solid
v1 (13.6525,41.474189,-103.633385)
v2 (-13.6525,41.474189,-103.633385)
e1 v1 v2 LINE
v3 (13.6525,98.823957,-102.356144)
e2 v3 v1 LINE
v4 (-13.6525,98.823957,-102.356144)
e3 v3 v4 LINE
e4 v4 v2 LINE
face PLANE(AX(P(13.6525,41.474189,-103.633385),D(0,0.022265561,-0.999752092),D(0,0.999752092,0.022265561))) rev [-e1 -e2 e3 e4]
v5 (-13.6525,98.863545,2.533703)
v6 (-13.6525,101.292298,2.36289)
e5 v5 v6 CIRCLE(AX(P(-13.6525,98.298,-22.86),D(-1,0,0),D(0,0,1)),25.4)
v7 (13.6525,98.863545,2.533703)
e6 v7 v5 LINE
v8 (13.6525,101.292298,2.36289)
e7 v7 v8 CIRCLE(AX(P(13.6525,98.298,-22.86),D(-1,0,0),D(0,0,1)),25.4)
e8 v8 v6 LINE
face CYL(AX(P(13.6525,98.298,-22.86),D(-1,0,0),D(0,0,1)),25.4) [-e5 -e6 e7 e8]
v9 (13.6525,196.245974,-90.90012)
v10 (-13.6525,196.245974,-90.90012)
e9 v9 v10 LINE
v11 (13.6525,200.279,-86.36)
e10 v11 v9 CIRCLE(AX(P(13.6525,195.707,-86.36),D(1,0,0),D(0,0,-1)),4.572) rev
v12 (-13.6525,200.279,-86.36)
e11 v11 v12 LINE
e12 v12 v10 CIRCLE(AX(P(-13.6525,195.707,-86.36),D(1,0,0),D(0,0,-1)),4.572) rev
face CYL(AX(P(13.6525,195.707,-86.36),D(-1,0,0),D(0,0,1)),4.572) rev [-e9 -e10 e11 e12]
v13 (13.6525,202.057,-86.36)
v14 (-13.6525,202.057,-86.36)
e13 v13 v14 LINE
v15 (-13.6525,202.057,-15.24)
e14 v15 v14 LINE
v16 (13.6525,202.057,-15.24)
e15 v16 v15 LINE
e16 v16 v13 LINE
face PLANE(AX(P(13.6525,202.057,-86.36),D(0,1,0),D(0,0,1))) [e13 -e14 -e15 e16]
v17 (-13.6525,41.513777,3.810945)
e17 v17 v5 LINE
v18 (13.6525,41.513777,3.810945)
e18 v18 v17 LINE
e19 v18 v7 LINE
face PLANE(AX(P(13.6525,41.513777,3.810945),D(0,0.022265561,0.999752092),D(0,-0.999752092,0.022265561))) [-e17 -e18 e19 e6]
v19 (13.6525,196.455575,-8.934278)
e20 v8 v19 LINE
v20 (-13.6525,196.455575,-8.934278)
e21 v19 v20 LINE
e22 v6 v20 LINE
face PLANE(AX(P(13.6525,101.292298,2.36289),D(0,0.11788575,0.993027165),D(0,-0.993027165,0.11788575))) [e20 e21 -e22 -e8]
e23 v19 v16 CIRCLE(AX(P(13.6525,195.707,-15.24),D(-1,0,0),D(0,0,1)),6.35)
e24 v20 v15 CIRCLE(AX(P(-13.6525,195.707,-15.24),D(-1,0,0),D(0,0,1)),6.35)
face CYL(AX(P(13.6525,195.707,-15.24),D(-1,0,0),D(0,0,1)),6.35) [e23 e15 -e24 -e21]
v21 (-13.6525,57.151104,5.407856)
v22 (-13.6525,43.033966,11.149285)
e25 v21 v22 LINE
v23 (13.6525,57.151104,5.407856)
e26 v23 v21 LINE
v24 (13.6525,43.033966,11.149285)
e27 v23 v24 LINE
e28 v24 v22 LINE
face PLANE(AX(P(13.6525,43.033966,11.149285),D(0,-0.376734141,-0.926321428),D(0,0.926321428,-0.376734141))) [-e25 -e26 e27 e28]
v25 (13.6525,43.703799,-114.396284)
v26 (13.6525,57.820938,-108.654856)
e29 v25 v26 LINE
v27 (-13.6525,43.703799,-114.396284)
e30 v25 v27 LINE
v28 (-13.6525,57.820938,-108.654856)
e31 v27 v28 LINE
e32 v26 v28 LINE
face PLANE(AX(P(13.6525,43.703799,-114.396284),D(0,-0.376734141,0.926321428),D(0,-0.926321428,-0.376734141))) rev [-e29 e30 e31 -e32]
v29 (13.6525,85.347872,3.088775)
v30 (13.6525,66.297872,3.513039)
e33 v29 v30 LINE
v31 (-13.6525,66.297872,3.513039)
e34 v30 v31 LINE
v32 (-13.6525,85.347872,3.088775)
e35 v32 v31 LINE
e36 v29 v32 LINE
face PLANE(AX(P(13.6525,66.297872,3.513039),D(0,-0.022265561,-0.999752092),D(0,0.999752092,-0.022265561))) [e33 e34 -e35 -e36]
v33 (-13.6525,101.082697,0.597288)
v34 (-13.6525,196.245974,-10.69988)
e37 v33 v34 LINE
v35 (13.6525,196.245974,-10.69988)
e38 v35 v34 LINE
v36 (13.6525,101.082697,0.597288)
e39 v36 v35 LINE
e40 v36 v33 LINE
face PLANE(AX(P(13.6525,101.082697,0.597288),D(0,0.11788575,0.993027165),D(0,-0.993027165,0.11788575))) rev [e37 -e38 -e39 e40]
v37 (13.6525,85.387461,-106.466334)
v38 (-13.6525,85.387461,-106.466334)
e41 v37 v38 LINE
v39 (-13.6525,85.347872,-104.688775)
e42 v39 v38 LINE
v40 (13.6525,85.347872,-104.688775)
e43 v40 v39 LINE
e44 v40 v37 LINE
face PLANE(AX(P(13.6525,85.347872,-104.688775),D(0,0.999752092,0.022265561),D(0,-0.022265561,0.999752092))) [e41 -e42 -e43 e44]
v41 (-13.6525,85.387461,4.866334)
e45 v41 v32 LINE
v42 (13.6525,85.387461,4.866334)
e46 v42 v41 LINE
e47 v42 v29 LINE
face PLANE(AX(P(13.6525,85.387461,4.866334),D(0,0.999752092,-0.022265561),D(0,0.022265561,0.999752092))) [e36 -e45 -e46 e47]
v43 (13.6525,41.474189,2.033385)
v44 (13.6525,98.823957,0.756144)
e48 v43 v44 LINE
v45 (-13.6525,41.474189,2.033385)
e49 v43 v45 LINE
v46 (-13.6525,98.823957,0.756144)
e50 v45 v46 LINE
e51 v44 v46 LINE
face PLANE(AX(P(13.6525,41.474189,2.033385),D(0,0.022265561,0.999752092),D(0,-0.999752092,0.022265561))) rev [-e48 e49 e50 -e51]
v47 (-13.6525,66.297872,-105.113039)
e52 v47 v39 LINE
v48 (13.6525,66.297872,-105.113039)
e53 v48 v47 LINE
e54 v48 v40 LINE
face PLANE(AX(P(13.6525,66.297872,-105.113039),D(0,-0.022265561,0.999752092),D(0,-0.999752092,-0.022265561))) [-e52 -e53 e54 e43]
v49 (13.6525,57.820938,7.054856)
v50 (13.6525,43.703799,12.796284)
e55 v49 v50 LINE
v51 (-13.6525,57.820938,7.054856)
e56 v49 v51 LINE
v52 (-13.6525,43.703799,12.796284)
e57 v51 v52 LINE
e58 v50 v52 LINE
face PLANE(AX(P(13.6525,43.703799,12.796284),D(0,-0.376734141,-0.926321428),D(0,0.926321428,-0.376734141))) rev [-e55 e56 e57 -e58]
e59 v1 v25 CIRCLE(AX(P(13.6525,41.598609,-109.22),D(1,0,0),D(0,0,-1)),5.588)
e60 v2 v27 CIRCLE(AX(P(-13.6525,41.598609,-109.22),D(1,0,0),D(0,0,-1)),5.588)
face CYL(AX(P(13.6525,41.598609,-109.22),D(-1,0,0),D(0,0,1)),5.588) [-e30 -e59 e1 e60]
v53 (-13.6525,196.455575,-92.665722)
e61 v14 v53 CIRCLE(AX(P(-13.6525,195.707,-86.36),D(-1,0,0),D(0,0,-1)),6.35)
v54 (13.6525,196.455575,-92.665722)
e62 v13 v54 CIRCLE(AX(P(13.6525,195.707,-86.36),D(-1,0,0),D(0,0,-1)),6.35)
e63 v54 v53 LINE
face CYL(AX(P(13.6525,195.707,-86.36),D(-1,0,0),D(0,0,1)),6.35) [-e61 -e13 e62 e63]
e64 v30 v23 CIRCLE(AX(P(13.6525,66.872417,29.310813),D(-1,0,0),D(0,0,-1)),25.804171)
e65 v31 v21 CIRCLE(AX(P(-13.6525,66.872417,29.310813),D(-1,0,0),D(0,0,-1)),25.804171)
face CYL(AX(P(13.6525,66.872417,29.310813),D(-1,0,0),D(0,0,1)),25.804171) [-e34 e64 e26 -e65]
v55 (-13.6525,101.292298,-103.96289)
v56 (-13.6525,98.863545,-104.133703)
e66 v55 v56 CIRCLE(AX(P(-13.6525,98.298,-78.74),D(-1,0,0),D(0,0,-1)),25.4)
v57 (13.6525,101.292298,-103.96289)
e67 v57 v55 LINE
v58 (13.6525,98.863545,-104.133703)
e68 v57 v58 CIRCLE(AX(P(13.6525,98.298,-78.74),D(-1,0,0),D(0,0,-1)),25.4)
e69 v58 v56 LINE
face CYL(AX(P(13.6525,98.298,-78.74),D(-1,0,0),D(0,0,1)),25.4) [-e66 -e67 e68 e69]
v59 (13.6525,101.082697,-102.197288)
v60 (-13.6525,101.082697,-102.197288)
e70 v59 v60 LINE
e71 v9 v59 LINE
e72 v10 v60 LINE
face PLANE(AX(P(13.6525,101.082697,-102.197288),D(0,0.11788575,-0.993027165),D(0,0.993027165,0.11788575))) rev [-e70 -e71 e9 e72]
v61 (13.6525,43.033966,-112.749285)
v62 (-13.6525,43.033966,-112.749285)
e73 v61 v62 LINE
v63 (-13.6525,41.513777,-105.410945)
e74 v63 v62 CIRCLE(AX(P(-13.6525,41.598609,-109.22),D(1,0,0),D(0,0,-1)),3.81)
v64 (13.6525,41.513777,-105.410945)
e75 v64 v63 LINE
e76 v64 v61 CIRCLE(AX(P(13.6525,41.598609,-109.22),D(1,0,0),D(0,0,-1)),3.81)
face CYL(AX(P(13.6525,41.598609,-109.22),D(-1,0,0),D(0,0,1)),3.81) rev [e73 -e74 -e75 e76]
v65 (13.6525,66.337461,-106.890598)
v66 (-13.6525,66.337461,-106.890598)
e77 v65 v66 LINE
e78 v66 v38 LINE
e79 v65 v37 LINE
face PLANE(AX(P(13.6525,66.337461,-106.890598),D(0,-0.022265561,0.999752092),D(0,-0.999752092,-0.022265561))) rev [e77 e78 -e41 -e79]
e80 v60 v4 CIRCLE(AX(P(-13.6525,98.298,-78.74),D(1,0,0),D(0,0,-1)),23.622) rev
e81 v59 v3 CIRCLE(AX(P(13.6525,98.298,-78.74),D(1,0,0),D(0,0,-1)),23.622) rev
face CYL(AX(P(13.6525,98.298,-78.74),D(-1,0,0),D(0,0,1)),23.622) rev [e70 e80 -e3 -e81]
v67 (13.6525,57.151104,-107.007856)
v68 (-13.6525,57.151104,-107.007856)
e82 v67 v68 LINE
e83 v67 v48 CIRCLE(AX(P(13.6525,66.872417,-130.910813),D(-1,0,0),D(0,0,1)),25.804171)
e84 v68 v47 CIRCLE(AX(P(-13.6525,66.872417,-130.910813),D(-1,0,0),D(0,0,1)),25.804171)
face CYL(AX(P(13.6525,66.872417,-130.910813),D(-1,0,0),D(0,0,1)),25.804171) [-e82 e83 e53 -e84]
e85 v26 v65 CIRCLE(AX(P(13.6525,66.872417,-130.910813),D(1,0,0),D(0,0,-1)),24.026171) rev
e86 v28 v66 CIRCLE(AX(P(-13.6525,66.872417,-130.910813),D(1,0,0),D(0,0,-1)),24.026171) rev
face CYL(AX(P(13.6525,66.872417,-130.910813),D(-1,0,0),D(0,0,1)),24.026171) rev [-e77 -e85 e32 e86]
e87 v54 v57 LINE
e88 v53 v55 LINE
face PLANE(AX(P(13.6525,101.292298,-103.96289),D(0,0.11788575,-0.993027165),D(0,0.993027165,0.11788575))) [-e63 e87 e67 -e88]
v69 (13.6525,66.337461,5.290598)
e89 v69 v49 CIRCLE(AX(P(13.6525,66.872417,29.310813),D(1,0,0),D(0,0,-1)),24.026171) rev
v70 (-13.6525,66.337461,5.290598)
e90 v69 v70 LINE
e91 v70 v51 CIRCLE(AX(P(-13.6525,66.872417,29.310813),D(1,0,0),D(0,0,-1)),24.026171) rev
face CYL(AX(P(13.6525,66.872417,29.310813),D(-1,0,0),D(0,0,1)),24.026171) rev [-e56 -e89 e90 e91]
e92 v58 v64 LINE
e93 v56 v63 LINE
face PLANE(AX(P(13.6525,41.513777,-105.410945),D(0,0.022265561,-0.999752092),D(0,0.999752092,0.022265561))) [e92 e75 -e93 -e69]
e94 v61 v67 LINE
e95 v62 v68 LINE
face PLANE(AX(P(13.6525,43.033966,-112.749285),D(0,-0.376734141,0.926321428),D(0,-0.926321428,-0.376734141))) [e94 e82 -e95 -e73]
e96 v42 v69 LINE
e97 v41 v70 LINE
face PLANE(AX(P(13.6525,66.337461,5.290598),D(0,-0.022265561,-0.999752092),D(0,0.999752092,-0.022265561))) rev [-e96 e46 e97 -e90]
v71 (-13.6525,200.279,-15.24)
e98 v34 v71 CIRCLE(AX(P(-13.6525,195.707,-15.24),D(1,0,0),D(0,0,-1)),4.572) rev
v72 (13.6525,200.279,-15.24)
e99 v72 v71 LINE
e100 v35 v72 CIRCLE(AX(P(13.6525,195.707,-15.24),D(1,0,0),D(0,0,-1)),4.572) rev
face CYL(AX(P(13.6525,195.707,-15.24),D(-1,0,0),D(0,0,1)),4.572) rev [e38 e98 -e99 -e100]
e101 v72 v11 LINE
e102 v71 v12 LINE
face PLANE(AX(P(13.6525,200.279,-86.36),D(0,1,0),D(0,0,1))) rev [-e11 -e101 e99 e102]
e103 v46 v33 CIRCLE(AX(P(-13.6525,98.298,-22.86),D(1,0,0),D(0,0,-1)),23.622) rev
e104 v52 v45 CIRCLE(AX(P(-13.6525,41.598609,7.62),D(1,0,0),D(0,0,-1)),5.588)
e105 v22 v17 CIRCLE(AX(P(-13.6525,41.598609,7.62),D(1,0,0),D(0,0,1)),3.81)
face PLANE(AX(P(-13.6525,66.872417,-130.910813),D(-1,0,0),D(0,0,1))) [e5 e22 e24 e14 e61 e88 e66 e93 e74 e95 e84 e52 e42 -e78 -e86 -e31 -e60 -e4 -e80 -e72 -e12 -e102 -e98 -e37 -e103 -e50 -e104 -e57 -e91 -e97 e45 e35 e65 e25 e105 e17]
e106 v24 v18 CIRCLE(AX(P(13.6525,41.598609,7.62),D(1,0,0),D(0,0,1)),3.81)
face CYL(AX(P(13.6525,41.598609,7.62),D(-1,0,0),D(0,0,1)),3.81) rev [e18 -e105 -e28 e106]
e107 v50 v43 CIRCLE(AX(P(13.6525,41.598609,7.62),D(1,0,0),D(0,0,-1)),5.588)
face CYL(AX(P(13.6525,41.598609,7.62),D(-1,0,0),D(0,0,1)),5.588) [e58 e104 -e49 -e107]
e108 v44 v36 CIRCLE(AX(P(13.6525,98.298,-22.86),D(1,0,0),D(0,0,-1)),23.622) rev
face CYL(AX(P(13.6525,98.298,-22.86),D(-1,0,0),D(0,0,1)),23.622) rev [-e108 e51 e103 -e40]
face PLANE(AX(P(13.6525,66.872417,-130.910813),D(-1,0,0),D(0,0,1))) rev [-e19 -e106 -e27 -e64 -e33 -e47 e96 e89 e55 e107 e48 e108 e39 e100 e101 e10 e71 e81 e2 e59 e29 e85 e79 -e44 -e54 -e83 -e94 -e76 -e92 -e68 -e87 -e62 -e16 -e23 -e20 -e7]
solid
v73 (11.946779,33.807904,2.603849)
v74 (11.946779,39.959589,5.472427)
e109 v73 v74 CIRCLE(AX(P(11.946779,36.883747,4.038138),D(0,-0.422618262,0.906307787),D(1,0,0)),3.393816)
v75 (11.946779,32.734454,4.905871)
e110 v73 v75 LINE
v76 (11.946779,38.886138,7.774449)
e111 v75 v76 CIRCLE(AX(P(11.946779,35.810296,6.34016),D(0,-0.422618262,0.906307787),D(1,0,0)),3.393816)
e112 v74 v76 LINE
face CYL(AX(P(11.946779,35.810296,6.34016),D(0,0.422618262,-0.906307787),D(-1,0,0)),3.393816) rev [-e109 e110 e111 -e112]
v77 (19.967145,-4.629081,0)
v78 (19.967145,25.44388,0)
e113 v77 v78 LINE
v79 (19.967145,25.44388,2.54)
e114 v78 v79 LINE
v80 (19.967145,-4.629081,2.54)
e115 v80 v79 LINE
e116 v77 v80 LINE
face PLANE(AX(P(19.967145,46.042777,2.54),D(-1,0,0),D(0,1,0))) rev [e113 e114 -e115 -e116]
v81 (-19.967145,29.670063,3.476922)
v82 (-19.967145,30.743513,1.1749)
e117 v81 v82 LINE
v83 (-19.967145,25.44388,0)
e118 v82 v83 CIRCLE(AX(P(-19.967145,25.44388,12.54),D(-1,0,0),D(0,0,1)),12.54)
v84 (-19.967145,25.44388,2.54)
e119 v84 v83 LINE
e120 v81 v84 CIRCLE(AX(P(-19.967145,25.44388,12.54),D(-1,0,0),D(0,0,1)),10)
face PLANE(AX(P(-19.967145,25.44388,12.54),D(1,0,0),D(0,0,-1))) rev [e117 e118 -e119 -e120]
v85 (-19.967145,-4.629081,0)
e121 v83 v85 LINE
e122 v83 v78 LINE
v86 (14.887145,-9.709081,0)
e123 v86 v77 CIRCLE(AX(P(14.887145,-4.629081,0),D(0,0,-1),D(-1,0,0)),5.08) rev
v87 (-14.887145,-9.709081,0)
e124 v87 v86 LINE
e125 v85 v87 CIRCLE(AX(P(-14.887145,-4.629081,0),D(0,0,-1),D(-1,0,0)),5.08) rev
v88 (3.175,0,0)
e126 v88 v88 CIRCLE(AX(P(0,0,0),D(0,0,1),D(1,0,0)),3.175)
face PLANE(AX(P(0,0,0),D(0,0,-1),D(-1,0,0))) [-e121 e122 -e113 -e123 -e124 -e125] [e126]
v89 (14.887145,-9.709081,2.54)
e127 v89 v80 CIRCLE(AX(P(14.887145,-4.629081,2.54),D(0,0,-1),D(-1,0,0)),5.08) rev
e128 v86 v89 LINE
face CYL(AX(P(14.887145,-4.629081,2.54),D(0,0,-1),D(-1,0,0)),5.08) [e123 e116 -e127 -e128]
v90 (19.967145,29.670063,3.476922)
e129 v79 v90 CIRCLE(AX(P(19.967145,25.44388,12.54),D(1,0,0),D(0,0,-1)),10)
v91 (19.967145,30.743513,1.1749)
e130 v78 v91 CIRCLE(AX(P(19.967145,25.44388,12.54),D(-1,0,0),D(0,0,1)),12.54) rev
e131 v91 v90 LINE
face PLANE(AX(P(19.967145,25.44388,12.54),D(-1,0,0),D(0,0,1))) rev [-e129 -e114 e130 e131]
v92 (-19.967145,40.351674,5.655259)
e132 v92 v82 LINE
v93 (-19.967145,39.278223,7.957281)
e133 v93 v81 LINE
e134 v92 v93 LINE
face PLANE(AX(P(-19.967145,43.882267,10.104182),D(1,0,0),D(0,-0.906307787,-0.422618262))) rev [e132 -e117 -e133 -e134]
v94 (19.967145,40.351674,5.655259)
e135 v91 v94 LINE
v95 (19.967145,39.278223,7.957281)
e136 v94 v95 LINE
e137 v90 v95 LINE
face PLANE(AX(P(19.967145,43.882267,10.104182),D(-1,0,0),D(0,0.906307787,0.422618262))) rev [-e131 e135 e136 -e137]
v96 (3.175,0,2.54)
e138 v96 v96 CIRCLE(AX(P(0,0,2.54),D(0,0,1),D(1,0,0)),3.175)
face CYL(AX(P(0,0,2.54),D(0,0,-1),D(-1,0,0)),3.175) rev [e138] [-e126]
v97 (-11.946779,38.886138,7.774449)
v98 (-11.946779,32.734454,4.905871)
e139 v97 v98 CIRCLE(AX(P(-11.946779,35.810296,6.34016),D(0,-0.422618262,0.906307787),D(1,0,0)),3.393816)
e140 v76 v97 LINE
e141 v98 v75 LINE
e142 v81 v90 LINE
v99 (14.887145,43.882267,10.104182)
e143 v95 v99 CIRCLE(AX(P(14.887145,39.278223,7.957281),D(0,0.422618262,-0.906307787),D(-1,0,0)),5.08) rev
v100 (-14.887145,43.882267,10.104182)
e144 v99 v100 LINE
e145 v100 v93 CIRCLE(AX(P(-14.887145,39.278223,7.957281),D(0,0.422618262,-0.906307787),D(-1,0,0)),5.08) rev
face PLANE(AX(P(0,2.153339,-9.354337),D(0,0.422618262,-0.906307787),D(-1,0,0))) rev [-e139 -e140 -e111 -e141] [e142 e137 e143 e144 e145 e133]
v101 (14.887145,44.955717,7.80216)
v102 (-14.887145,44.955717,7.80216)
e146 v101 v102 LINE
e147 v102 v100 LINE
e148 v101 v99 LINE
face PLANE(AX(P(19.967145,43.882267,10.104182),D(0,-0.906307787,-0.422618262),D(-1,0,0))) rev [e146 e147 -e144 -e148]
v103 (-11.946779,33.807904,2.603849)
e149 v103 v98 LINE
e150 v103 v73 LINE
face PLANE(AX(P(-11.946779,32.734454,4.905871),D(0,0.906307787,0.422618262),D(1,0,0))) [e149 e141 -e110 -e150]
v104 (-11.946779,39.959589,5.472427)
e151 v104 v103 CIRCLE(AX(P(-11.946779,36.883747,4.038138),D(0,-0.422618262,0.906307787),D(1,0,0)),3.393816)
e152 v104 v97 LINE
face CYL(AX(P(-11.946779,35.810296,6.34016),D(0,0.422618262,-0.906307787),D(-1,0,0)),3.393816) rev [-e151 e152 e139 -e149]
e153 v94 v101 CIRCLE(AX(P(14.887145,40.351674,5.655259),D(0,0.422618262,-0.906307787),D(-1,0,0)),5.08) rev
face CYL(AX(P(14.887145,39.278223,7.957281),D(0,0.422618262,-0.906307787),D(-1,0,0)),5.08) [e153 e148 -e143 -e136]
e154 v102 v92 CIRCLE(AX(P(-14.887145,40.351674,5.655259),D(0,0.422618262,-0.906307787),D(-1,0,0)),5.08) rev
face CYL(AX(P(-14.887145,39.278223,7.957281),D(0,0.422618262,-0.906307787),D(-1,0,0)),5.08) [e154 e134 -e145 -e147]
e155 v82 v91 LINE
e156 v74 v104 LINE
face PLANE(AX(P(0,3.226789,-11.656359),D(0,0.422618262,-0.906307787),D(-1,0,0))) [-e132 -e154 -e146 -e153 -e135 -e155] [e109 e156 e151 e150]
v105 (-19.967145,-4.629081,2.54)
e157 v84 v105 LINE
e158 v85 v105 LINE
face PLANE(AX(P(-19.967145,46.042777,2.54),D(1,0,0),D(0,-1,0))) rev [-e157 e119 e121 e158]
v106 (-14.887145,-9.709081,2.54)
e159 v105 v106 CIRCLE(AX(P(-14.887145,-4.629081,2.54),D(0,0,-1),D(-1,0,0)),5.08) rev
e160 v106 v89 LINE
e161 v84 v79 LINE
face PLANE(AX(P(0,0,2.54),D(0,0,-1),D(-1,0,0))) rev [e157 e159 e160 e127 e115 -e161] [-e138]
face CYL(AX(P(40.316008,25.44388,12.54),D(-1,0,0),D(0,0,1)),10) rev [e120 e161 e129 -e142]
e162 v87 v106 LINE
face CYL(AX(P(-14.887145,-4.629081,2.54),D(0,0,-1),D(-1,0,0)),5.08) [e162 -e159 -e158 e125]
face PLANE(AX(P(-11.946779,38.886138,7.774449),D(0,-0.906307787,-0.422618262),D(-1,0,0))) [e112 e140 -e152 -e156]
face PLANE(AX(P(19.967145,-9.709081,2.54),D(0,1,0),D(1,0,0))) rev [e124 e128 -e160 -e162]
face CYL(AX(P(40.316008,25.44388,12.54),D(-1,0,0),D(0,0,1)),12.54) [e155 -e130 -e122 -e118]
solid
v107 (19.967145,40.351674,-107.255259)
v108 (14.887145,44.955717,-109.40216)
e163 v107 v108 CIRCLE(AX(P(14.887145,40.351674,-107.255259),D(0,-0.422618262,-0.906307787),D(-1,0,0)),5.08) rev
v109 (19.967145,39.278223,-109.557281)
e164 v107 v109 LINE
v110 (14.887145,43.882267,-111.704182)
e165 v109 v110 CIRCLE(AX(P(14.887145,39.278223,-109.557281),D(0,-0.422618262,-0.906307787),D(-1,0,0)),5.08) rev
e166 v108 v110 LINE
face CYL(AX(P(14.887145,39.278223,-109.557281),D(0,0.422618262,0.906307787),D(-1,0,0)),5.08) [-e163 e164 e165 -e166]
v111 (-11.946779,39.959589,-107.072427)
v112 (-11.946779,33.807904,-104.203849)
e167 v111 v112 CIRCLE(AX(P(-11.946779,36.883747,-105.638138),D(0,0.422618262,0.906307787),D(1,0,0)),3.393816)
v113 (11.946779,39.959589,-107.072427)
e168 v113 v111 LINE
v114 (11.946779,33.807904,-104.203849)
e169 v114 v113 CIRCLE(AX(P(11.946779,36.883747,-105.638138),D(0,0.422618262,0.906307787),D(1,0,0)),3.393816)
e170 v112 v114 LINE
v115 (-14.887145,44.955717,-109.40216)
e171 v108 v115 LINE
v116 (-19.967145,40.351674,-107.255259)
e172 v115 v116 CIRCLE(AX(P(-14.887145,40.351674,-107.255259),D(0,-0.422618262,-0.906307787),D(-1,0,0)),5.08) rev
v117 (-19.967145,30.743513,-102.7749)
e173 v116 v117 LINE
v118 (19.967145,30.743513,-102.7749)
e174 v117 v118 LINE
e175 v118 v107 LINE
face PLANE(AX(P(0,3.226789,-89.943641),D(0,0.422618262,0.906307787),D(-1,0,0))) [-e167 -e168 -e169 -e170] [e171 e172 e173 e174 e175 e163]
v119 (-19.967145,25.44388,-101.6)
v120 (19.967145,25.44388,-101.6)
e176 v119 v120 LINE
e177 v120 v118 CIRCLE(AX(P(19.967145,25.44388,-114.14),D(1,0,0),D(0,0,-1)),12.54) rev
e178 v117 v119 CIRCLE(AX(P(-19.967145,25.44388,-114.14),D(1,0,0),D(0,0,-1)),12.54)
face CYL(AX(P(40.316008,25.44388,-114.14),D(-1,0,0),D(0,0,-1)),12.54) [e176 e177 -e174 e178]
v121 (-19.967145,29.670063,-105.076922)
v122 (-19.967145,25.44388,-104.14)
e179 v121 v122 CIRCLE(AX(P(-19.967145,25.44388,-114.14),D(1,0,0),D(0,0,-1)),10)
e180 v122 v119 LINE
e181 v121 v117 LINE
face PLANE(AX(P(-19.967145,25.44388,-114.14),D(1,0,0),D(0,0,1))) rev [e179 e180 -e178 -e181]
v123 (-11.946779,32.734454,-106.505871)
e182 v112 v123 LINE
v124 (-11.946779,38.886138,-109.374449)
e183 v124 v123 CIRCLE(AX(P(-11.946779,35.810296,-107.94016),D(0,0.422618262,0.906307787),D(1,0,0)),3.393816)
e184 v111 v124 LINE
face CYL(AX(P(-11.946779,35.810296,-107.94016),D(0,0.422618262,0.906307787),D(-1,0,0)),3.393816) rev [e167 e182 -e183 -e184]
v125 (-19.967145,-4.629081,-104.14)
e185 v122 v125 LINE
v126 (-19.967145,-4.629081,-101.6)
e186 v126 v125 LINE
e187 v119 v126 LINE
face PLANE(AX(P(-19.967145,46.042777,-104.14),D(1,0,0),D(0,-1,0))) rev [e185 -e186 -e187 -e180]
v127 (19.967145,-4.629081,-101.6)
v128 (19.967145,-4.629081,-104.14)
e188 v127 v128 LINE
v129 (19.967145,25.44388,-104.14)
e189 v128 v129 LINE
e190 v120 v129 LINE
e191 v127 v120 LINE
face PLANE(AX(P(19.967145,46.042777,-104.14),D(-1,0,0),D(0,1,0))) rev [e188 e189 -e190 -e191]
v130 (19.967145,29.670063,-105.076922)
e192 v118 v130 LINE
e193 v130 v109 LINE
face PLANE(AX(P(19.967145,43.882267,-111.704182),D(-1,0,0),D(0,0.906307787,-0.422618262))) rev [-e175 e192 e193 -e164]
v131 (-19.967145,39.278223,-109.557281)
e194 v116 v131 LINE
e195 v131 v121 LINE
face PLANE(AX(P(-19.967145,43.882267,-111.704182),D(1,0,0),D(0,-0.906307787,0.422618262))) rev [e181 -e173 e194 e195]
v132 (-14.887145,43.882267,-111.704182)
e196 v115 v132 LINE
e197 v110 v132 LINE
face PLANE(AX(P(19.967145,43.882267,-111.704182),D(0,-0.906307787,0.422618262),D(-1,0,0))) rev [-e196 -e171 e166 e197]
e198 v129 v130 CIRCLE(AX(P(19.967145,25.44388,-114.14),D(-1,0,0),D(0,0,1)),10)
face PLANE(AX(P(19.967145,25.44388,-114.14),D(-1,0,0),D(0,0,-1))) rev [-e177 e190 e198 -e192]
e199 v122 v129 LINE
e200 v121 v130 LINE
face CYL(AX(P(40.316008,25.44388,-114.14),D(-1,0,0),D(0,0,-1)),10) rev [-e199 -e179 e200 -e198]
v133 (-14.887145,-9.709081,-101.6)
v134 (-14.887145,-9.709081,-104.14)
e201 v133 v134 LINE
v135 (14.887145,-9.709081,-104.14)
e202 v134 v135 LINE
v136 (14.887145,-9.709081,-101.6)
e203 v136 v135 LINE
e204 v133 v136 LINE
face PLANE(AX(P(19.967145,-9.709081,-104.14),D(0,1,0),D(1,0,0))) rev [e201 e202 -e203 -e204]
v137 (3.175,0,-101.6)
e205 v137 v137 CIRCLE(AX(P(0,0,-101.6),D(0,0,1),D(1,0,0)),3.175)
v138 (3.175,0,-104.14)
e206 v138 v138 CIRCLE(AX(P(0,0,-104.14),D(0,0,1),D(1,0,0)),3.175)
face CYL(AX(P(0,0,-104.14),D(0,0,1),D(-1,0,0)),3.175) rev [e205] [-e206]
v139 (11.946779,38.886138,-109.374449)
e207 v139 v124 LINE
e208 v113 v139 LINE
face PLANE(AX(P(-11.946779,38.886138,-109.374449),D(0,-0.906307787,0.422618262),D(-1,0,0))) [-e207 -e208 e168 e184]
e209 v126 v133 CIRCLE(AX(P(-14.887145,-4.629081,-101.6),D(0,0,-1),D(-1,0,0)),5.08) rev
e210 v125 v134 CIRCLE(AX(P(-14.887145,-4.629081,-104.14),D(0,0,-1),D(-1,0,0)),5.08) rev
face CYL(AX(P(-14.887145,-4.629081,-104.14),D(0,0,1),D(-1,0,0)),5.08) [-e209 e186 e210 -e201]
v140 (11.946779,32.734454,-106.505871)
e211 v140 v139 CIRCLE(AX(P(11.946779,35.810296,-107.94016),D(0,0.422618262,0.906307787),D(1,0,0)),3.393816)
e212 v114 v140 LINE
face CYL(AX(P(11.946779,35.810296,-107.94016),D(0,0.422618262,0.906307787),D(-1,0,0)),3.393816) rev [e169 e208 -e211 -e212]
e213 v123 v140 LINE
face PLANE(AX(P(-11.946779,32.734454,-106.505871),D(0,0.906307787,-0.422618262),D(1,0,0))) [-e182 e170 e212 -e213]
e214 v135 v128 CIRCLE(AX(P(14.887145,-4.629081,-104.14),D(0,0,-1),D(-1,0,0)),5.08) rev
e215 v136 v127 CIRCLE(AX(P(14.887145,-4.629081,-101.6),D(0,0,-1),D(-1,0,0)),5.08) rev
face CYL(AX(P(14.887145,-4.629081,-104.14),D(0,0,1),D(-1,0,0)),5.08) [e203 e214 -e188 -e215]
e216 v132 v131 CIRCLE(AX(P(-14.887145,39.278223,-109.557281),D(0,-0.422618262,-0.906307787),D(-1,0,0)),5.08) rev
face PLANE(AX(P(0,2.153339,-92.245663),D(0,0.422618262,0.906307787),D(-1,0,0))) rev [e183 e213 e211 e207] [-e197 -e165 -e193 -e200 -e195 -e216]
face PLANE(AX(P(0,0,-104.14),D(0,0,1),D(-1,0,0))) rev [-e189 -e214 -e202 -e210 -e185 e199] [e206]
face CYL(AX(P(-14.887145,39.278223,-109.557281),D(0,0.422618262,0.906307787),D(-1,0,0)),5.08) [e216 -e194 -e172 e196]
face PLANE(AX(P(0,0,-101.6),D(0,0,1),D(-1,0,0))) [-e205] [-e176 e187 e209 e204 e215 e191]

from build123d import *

# Parameters (mm, degrees)
SKETCH1_W              = 39.934289188
SKETCH1_H              = 55.751858455
SKETCH1_R              = 3.175
BOSS_EXTRUDE1_DEPTH    = 2.54
FILLET1_R              = 5.08
SKETCHED_START         = 13.211024663
SKETCHED_BEND1_DEPTH   = 6.788975337
SKETCHED_START_2       = -19.967144594
SKETCHED_BEND1_2_DEPTH = 39.934289188
SKETCHED_START_3       = -14.887144594
SKETCHED_BEND1_3_DEPTH = 29.774289188
SKETCHED_START_4       = 15.340595558
SKETCHED_BEND1_4_DEPTH = 4.626549036
SKETCHED_BEND1_5_DEPTH = 4.626548936
SKETCHED_START_5       = -16.083135627
SKETCHED_BEND1_6_DEPTH = 31.94743135
SKETCHED_START_6       = 9.387948772
SKETCHED_BEND1_7_DEPTH = 2.54
EXTRUDE_THIN3_DEPTH    = 13.6525


with BuildPart() as part:
    # Sketch1 → Boss-Extrude1 (new body)
    with BuildSketch(Plane.XY):
        with Locations((0, 18.166848245)):
            Rectangle(SKETCH1_W, SKETCH1_H)
        Circle(SKETCH1_R, mode=Mode.SUBTRACT)
        with BuildLine():
            Line((-11.946779197, 40.530159664), (11.946779197, 40.530159664))
            ThreePointArc((11.946779197, 40.530159664), (15.340595558, 37.136343303), (11.946779197, 33.742526942))
            Line((11.946779197, 33.742526942), (-11.946779197, 33.742526942))
            ThreePointArc((-11.946779197, 33.742526942), (-15.340595558, 37.136343303), (-11.946779197, 40.530159664))
        make_face(mode=Mode.SUBTRACT)
    extrude(amount=BOSS_EXTRUDE1_DEPTH)

    # Fillet1
    fillet1_edges = [part.edges().sort_by_distance(p)[0] for p in [
        (-19.967144594, 46.042777472, 1.27),
        (19.967144594, 46.042777472, 1.27),
        (19.967144594, -9.709080983, 1.27),
        (-19.967144594, -9.709080983, 1.27),
    ]]
    fillet(fillet1_edges, radius=FILLET1_R)

    # Sketched Bend1: read off the stored shape, not the designer's step
    # Sketched Bend1 outline → Sketched Bend1 (cut)
    with BuildSketch(Plane(origin=(0, 0, 0), x_dir=(1, 0, 0), z_dir=(0, 0.4226182617407011, -0.9063077870366493)).offset(SKETCHED_START)):
        with BuildLine():
            Line((-11.946779197, -38.528434057), (11.946779197, -38.528434057))
            ThreePointArc((11.946779197, -38.528434057), (15.340595558, -35.134617696), (11.946779197, -31.740801335))
            Line((11.946779197, -31.740801335), (-11.946779197, -31.740801335))
            ThreePointArc((-11.946779197, -31.740801335), (-15.340595558, -35.134617696), (-11.946779197, -38.528434057))
        make_face()
    extrude(amount=SKETCHED_BEND1_DEPTH, mode=Mode.SUBTRACT)

    # Sketched Bend1 2 outline → Sketched Bend1 2 (cut)
    with BuildSketch(Plane.YZ.offset(SKETCHED_START_2)):
        with BuildLine():
            Line((33.670978847, 2.54), (30.743513202, 1.174900351))
            ThreePointArc((30.743513202, 1.174900351), (28.158032959, 0.297248071), (25.4438802, 0))
            Line((25.4438802, 0), (46.042777472, 0))
            Line((46.042777472, 0), (46.042777472, 2.54))
            Line((46.042777472, 2.54), (33.670978847, 2.54))
        make_face()
    extrude(amount=SKETCHED_BEND1_2_DEPTH, mode=Mode.SUBTRACT)

    # Sketched Bend1 3 outline → Sketched Bend1 3 (add)
    with BuildSketch(Plane.YZ.offset(SKETCHED_START_3)):
        with BuildLine():
            Line((32.734454008, 4.90587121), (29.670062817, 3.47692213))
            ThreePointArc((29.670062817, 3.47692213), (27.608276339, 2.777039929), (25.4438802, 2.54))
            Line((25.4438802, 2.54), (33.670978847, 2.54))
            Line((33.670978847, 2.54), (33.807904393, 2.603849431))
            Line((33.807904393, 2.603849431), (32.734454008, 4.90587121))
        make_face()
        Polygon((43.882266846, 10.104181707), (38.886138399, 7.774448751), (39.959588784, 5.472426973), (44.95571723, 7.802159928), align=None)
    extrude(amount=SKETCHED_BEND1_3_DEPTH)

    # Sketched Bend1 4 outline → Sketched Bend1 4 (add)
    with BuildSketch(Plane.YZ.offset(SKETCHED_START_4)):
        with BuildLine():
            ThreePointArc((29.670062817, 3.47692213), (27.608276339, 2.777039929), (25.4438802, 2.54))
            Line((25.4438802, 2.54), (33.670978847, 2.54))
            Line((33.670978847, 2.54), (39.959588784, 5.472426973))
            Line((39.959588784, 5.472426973), (38.886138399, 7.774448752))
            Line((38.886138399, 7.774448752), (29.670062817, 3.47692213))
        make_face()
    extrude(amount=SKETCHED_BEND1_4_DEPTH)

    # Sketched Bend1 5 outline → Sketched Bend1 5 (add)
    with BuildSketch(Plane.YZ.offset(SKETCHED_START_2)):
        with BuildLine():
            ThreePointArc((29.670062817, 3.47692213), (27.608276339, 2.777039929), (25.4438802, 2.54))
            Line((25.4438802, 2.54), (33.670978847, 2.54))
            Line((33.670978847, 2.54), (39.959588784, 5.472426973))
            Line((39.959588784, 5.472426973), (38.886138399, 7.774448752))
            Line((38.886138399, 7.774448752), (29.670062817, 3.47692213))
        make_face()
    extrude(amount=SKETCHED_BEND1_5_DEPTH)

    # Sketched Bend1 6 outline → Sketched Bend1 6 (add)
    with BuildSketch(Plane.YZ.offset(SKETCHED_START_5)):
        with BuildLine():
            Line((32.734454008, 4.90587121), (29.670062817, 3.47692213))
            ThreePointArc((29.670062817, 3.47692213), (27.608276339, 2.777039929), (25.4438802, 2.54))
            Line((25.4438802, 2.54), (33.670978847, 2.54))
            Line((33.670978847, 2.54), (33.807904393, 2.603849431))
            Line((33.807904393, 2.603849431), (32.734454008, 4.90587121))
        make_face()
    extrude(amount=SKETCHED_BEND1_6_DEPTH)

    # Sketched Bend1 7 outline → Sketched Bend1 7 (add)
    with BuildSketch(Plane(origin=(0, 0, 0), x_dir=(1, 0, 0), z_dir=(0, 0.4226182617407011, -0.9063077870366493)).offset(SKETCHED_START_6)):
        with BuildLine():
            ThreePointArc((15.340595558, -35.134617696), (14.34656976, -37.534408259), (11.946779197, -38.528434057))
            Line((11.946779197, -38.528434057), (14.887144594, -38.528434056))
            Line((14.887144594, -38.528434056), (14.887144594, -44.041051864))
            ThreePointArc((14.887144594, -44.041051864), (18.479247043, -42.553154312), (19.967144594, -38.961051864))
            Line((19.967144594, -38.961051864), (19.967144594, -38.528434057))
            Line((19.967144594, -38.528434057), (15.340595558, -38.528434057))
            Line((15.340595558, -38.528434057), (15.340595558, -35.134617696))
        make_face()
        with BuildLine():
            ThreePointArc((11.946779197, -31.740801335), (14.34656976, -32.734827133), (15.340595558, -35.134617696))
            Line((15.340595558, -35.134617696), (15.340595558, -31.740801335))
            Line((15.340595558, -31.740801335), (11.946779197, -31.740801335))
        make_face()
        with BuildLine():
            Line((-14.887144594, -38.528434056), (-11.946779197, -38.528434057))
            ThreePointArc((-11.946779197, -38.528434057), (-14.34656976, -37.534408259), (-15.340595558, -35.134617696))
            Line((-15.340595558, -35.134617696), (-15.340595658, -38.528434057))
            Line((-15.340595658, -38.528434057), (-19.967144594, -38.528434057))
            Line((-19.967144594, -38.528434057), (-19.967144594, -38.961051864))
            ThreePointArc((-19.967144594, -38.961051864), (-18.479247043, -42.553154312), (-14.887144594, -44.041051864))
            Line((-14.887144594, -44.041051864), (-14.887144594, -38.528434056))
        make_face()
        with BuildLine():
            Line((-15.340595658, -31.740801335), (-15.340595558, -35.134617696))
            ThreePointArc((-15.340595558, -35.134617696), (-14.34656976, -32.734827133), (-11.946779197, -31.740801335))
            Line((-11.946779197, -31.740801335), (-15.340595658, -31.740801335))
        make_face()
    extrude(amount=SKETCHED_BEND1_7_DEPTH)


with BuildPart() as body_2:
    # Mirror1: mirrored copy
    add(part.part.mirror(Plane(origin=(0, 0, -50.8), x_dir=(1, 0, 0), z_dir=(0, 0, -1))))


with BuildPart() as body_3:
    # Sketch10 → Extrude-Thin3 (new, symmetric)
    with BuildSketch(Plane(origin=(0, 0, 0), x_dir=(0, 0, -1), z_dir=(1, 0, 0))):
        with BuildLine():
            Line((104.688774774, 85.347872367), (105.113038889, 66.297872367))
            ThreePointArc((105.113038889, 66.297872367), (105.643116213, 61.638035226), (107.007856334, 57.151104365))
            Line((107.007856334, 57.151104365), (112.749284639, 43.033965808))
            ThreePointArc((112.749284639, 43.033965808), (109.992859285, 37.867819469), (105.410944531, 41.513776945))
            Line((105.410944531, 41.513776945), (104.133703128, 98.863545249))
            ThreePointArc((104.133703128, 98.863545249), (104.077414719, 100.079969515), (103.962889985, 101.292298045))
            Line((103.962889985, 101.292298045), (92.665722496, 196.455574511))
            ThreePointArc((92.665722496, 196.455574511), (90.57717037, 200.454417622), (86.36, 202.057))
            Line((86.36, 202.057), (15.24, 202.057))
            ThreePointArc((15.24, 202.057), (11.02282963, 200.454417622), (8.934277504, 196.455574511))
            Line((8.934277504, 196.455574511), (-2.362889985, 101.292298045))
            ThreePointArc((-2.362889985, 101.292298045), (-2.477414719, 100.079969515), (-2.533703128, 98.863545249))
            Line((-2.533703128, 98.863545249), (-3.810944531, 41.513776945))
            ThreePointArc((-3.810944531, 41.513776945), (-8.392859285, 37.867819469), (-11.149284639, 43.033965808))
            Line((-11.149284639, 43.033965808), (-5.407856334, 57.151104365))
            ThreePointArc((-5.407856334, 57.151104365), (-4.043116213, 61.638035226), (-3.513038889, 66.297872367))
            Line((-3.513038889, 66.297872367), (-3.088774774, 85.347872367))
            Line((-3.088774774, 85.347872367), (-4.866333993, 85.387460534))
            Line((-4.866333993, 85.387460534), (-5.290598108, 66.337460534))
            ThreePointArc((-5.290598108, 66.337460534), (-5.784151202, 61.998702892), (-7.054855833, 57.820937667))
            Line((-7.054855833, 57.820937667), (-12.796284137, 43.703799111))
            ThreePointArc((-12.796284137, 43.703799111), (-8.753526951, 36.12678448), (-2.033385312, 41.474188777))
            Line((-2.033385312, 41.474188777), (-0.756143909, 98.823957082))
            ThreePointArc((-0.756143909, 98.823957082), (-0.703795689, 99.955231649), (-0.597287686, 101.082697182))
            Line((-0.597287686, 101.082697182), (10.699879803, 196.245973648))
            ThreePointArc((10.699879803, 196.245973648), (12.203637334, 199.125140688), (15.24, 200.279))
            Line((15.24, 200.279), (86.36, 200.279))
            ThreePointArc((86.36, 200.279), (89.396362666, 199.125140688), (90.900120197, 196.245973648))
            Line((90.900120197, 196.245973648), (102.197287686, 101.082697182))
            ThreePointArc((102.197287686, 101.082697182), (102.303795689, 99.955231649), (102.356143909, 98.823957082))
            Line((102.356143909, 98.823957082), (103.633385312, 41.474188777))
            ThreePointArc((103.633385312, 41.474188777), (110.353526951, 36.12678448), (114.396284137, 43.703799111))
            Line((114.396284137, 43.703799111), (108.654855833, 57.820937667))
            ThreePointArc((108.654855833, 57.820937667), (107.384151202, 61.998702892), (106.890598108, 66.337460534))
            Line((106.890598108, 66.337460534), (106.466333993, 85.387460534))
            Line((106.466333993, 85.387460534), (104.688774774, 85.347872367))
        make_face()
    extrude(amount=EXTRUDE_THIN3_DEPTH, both=True)


solid = Compound([part.part, body_2.part, body_3.part])
